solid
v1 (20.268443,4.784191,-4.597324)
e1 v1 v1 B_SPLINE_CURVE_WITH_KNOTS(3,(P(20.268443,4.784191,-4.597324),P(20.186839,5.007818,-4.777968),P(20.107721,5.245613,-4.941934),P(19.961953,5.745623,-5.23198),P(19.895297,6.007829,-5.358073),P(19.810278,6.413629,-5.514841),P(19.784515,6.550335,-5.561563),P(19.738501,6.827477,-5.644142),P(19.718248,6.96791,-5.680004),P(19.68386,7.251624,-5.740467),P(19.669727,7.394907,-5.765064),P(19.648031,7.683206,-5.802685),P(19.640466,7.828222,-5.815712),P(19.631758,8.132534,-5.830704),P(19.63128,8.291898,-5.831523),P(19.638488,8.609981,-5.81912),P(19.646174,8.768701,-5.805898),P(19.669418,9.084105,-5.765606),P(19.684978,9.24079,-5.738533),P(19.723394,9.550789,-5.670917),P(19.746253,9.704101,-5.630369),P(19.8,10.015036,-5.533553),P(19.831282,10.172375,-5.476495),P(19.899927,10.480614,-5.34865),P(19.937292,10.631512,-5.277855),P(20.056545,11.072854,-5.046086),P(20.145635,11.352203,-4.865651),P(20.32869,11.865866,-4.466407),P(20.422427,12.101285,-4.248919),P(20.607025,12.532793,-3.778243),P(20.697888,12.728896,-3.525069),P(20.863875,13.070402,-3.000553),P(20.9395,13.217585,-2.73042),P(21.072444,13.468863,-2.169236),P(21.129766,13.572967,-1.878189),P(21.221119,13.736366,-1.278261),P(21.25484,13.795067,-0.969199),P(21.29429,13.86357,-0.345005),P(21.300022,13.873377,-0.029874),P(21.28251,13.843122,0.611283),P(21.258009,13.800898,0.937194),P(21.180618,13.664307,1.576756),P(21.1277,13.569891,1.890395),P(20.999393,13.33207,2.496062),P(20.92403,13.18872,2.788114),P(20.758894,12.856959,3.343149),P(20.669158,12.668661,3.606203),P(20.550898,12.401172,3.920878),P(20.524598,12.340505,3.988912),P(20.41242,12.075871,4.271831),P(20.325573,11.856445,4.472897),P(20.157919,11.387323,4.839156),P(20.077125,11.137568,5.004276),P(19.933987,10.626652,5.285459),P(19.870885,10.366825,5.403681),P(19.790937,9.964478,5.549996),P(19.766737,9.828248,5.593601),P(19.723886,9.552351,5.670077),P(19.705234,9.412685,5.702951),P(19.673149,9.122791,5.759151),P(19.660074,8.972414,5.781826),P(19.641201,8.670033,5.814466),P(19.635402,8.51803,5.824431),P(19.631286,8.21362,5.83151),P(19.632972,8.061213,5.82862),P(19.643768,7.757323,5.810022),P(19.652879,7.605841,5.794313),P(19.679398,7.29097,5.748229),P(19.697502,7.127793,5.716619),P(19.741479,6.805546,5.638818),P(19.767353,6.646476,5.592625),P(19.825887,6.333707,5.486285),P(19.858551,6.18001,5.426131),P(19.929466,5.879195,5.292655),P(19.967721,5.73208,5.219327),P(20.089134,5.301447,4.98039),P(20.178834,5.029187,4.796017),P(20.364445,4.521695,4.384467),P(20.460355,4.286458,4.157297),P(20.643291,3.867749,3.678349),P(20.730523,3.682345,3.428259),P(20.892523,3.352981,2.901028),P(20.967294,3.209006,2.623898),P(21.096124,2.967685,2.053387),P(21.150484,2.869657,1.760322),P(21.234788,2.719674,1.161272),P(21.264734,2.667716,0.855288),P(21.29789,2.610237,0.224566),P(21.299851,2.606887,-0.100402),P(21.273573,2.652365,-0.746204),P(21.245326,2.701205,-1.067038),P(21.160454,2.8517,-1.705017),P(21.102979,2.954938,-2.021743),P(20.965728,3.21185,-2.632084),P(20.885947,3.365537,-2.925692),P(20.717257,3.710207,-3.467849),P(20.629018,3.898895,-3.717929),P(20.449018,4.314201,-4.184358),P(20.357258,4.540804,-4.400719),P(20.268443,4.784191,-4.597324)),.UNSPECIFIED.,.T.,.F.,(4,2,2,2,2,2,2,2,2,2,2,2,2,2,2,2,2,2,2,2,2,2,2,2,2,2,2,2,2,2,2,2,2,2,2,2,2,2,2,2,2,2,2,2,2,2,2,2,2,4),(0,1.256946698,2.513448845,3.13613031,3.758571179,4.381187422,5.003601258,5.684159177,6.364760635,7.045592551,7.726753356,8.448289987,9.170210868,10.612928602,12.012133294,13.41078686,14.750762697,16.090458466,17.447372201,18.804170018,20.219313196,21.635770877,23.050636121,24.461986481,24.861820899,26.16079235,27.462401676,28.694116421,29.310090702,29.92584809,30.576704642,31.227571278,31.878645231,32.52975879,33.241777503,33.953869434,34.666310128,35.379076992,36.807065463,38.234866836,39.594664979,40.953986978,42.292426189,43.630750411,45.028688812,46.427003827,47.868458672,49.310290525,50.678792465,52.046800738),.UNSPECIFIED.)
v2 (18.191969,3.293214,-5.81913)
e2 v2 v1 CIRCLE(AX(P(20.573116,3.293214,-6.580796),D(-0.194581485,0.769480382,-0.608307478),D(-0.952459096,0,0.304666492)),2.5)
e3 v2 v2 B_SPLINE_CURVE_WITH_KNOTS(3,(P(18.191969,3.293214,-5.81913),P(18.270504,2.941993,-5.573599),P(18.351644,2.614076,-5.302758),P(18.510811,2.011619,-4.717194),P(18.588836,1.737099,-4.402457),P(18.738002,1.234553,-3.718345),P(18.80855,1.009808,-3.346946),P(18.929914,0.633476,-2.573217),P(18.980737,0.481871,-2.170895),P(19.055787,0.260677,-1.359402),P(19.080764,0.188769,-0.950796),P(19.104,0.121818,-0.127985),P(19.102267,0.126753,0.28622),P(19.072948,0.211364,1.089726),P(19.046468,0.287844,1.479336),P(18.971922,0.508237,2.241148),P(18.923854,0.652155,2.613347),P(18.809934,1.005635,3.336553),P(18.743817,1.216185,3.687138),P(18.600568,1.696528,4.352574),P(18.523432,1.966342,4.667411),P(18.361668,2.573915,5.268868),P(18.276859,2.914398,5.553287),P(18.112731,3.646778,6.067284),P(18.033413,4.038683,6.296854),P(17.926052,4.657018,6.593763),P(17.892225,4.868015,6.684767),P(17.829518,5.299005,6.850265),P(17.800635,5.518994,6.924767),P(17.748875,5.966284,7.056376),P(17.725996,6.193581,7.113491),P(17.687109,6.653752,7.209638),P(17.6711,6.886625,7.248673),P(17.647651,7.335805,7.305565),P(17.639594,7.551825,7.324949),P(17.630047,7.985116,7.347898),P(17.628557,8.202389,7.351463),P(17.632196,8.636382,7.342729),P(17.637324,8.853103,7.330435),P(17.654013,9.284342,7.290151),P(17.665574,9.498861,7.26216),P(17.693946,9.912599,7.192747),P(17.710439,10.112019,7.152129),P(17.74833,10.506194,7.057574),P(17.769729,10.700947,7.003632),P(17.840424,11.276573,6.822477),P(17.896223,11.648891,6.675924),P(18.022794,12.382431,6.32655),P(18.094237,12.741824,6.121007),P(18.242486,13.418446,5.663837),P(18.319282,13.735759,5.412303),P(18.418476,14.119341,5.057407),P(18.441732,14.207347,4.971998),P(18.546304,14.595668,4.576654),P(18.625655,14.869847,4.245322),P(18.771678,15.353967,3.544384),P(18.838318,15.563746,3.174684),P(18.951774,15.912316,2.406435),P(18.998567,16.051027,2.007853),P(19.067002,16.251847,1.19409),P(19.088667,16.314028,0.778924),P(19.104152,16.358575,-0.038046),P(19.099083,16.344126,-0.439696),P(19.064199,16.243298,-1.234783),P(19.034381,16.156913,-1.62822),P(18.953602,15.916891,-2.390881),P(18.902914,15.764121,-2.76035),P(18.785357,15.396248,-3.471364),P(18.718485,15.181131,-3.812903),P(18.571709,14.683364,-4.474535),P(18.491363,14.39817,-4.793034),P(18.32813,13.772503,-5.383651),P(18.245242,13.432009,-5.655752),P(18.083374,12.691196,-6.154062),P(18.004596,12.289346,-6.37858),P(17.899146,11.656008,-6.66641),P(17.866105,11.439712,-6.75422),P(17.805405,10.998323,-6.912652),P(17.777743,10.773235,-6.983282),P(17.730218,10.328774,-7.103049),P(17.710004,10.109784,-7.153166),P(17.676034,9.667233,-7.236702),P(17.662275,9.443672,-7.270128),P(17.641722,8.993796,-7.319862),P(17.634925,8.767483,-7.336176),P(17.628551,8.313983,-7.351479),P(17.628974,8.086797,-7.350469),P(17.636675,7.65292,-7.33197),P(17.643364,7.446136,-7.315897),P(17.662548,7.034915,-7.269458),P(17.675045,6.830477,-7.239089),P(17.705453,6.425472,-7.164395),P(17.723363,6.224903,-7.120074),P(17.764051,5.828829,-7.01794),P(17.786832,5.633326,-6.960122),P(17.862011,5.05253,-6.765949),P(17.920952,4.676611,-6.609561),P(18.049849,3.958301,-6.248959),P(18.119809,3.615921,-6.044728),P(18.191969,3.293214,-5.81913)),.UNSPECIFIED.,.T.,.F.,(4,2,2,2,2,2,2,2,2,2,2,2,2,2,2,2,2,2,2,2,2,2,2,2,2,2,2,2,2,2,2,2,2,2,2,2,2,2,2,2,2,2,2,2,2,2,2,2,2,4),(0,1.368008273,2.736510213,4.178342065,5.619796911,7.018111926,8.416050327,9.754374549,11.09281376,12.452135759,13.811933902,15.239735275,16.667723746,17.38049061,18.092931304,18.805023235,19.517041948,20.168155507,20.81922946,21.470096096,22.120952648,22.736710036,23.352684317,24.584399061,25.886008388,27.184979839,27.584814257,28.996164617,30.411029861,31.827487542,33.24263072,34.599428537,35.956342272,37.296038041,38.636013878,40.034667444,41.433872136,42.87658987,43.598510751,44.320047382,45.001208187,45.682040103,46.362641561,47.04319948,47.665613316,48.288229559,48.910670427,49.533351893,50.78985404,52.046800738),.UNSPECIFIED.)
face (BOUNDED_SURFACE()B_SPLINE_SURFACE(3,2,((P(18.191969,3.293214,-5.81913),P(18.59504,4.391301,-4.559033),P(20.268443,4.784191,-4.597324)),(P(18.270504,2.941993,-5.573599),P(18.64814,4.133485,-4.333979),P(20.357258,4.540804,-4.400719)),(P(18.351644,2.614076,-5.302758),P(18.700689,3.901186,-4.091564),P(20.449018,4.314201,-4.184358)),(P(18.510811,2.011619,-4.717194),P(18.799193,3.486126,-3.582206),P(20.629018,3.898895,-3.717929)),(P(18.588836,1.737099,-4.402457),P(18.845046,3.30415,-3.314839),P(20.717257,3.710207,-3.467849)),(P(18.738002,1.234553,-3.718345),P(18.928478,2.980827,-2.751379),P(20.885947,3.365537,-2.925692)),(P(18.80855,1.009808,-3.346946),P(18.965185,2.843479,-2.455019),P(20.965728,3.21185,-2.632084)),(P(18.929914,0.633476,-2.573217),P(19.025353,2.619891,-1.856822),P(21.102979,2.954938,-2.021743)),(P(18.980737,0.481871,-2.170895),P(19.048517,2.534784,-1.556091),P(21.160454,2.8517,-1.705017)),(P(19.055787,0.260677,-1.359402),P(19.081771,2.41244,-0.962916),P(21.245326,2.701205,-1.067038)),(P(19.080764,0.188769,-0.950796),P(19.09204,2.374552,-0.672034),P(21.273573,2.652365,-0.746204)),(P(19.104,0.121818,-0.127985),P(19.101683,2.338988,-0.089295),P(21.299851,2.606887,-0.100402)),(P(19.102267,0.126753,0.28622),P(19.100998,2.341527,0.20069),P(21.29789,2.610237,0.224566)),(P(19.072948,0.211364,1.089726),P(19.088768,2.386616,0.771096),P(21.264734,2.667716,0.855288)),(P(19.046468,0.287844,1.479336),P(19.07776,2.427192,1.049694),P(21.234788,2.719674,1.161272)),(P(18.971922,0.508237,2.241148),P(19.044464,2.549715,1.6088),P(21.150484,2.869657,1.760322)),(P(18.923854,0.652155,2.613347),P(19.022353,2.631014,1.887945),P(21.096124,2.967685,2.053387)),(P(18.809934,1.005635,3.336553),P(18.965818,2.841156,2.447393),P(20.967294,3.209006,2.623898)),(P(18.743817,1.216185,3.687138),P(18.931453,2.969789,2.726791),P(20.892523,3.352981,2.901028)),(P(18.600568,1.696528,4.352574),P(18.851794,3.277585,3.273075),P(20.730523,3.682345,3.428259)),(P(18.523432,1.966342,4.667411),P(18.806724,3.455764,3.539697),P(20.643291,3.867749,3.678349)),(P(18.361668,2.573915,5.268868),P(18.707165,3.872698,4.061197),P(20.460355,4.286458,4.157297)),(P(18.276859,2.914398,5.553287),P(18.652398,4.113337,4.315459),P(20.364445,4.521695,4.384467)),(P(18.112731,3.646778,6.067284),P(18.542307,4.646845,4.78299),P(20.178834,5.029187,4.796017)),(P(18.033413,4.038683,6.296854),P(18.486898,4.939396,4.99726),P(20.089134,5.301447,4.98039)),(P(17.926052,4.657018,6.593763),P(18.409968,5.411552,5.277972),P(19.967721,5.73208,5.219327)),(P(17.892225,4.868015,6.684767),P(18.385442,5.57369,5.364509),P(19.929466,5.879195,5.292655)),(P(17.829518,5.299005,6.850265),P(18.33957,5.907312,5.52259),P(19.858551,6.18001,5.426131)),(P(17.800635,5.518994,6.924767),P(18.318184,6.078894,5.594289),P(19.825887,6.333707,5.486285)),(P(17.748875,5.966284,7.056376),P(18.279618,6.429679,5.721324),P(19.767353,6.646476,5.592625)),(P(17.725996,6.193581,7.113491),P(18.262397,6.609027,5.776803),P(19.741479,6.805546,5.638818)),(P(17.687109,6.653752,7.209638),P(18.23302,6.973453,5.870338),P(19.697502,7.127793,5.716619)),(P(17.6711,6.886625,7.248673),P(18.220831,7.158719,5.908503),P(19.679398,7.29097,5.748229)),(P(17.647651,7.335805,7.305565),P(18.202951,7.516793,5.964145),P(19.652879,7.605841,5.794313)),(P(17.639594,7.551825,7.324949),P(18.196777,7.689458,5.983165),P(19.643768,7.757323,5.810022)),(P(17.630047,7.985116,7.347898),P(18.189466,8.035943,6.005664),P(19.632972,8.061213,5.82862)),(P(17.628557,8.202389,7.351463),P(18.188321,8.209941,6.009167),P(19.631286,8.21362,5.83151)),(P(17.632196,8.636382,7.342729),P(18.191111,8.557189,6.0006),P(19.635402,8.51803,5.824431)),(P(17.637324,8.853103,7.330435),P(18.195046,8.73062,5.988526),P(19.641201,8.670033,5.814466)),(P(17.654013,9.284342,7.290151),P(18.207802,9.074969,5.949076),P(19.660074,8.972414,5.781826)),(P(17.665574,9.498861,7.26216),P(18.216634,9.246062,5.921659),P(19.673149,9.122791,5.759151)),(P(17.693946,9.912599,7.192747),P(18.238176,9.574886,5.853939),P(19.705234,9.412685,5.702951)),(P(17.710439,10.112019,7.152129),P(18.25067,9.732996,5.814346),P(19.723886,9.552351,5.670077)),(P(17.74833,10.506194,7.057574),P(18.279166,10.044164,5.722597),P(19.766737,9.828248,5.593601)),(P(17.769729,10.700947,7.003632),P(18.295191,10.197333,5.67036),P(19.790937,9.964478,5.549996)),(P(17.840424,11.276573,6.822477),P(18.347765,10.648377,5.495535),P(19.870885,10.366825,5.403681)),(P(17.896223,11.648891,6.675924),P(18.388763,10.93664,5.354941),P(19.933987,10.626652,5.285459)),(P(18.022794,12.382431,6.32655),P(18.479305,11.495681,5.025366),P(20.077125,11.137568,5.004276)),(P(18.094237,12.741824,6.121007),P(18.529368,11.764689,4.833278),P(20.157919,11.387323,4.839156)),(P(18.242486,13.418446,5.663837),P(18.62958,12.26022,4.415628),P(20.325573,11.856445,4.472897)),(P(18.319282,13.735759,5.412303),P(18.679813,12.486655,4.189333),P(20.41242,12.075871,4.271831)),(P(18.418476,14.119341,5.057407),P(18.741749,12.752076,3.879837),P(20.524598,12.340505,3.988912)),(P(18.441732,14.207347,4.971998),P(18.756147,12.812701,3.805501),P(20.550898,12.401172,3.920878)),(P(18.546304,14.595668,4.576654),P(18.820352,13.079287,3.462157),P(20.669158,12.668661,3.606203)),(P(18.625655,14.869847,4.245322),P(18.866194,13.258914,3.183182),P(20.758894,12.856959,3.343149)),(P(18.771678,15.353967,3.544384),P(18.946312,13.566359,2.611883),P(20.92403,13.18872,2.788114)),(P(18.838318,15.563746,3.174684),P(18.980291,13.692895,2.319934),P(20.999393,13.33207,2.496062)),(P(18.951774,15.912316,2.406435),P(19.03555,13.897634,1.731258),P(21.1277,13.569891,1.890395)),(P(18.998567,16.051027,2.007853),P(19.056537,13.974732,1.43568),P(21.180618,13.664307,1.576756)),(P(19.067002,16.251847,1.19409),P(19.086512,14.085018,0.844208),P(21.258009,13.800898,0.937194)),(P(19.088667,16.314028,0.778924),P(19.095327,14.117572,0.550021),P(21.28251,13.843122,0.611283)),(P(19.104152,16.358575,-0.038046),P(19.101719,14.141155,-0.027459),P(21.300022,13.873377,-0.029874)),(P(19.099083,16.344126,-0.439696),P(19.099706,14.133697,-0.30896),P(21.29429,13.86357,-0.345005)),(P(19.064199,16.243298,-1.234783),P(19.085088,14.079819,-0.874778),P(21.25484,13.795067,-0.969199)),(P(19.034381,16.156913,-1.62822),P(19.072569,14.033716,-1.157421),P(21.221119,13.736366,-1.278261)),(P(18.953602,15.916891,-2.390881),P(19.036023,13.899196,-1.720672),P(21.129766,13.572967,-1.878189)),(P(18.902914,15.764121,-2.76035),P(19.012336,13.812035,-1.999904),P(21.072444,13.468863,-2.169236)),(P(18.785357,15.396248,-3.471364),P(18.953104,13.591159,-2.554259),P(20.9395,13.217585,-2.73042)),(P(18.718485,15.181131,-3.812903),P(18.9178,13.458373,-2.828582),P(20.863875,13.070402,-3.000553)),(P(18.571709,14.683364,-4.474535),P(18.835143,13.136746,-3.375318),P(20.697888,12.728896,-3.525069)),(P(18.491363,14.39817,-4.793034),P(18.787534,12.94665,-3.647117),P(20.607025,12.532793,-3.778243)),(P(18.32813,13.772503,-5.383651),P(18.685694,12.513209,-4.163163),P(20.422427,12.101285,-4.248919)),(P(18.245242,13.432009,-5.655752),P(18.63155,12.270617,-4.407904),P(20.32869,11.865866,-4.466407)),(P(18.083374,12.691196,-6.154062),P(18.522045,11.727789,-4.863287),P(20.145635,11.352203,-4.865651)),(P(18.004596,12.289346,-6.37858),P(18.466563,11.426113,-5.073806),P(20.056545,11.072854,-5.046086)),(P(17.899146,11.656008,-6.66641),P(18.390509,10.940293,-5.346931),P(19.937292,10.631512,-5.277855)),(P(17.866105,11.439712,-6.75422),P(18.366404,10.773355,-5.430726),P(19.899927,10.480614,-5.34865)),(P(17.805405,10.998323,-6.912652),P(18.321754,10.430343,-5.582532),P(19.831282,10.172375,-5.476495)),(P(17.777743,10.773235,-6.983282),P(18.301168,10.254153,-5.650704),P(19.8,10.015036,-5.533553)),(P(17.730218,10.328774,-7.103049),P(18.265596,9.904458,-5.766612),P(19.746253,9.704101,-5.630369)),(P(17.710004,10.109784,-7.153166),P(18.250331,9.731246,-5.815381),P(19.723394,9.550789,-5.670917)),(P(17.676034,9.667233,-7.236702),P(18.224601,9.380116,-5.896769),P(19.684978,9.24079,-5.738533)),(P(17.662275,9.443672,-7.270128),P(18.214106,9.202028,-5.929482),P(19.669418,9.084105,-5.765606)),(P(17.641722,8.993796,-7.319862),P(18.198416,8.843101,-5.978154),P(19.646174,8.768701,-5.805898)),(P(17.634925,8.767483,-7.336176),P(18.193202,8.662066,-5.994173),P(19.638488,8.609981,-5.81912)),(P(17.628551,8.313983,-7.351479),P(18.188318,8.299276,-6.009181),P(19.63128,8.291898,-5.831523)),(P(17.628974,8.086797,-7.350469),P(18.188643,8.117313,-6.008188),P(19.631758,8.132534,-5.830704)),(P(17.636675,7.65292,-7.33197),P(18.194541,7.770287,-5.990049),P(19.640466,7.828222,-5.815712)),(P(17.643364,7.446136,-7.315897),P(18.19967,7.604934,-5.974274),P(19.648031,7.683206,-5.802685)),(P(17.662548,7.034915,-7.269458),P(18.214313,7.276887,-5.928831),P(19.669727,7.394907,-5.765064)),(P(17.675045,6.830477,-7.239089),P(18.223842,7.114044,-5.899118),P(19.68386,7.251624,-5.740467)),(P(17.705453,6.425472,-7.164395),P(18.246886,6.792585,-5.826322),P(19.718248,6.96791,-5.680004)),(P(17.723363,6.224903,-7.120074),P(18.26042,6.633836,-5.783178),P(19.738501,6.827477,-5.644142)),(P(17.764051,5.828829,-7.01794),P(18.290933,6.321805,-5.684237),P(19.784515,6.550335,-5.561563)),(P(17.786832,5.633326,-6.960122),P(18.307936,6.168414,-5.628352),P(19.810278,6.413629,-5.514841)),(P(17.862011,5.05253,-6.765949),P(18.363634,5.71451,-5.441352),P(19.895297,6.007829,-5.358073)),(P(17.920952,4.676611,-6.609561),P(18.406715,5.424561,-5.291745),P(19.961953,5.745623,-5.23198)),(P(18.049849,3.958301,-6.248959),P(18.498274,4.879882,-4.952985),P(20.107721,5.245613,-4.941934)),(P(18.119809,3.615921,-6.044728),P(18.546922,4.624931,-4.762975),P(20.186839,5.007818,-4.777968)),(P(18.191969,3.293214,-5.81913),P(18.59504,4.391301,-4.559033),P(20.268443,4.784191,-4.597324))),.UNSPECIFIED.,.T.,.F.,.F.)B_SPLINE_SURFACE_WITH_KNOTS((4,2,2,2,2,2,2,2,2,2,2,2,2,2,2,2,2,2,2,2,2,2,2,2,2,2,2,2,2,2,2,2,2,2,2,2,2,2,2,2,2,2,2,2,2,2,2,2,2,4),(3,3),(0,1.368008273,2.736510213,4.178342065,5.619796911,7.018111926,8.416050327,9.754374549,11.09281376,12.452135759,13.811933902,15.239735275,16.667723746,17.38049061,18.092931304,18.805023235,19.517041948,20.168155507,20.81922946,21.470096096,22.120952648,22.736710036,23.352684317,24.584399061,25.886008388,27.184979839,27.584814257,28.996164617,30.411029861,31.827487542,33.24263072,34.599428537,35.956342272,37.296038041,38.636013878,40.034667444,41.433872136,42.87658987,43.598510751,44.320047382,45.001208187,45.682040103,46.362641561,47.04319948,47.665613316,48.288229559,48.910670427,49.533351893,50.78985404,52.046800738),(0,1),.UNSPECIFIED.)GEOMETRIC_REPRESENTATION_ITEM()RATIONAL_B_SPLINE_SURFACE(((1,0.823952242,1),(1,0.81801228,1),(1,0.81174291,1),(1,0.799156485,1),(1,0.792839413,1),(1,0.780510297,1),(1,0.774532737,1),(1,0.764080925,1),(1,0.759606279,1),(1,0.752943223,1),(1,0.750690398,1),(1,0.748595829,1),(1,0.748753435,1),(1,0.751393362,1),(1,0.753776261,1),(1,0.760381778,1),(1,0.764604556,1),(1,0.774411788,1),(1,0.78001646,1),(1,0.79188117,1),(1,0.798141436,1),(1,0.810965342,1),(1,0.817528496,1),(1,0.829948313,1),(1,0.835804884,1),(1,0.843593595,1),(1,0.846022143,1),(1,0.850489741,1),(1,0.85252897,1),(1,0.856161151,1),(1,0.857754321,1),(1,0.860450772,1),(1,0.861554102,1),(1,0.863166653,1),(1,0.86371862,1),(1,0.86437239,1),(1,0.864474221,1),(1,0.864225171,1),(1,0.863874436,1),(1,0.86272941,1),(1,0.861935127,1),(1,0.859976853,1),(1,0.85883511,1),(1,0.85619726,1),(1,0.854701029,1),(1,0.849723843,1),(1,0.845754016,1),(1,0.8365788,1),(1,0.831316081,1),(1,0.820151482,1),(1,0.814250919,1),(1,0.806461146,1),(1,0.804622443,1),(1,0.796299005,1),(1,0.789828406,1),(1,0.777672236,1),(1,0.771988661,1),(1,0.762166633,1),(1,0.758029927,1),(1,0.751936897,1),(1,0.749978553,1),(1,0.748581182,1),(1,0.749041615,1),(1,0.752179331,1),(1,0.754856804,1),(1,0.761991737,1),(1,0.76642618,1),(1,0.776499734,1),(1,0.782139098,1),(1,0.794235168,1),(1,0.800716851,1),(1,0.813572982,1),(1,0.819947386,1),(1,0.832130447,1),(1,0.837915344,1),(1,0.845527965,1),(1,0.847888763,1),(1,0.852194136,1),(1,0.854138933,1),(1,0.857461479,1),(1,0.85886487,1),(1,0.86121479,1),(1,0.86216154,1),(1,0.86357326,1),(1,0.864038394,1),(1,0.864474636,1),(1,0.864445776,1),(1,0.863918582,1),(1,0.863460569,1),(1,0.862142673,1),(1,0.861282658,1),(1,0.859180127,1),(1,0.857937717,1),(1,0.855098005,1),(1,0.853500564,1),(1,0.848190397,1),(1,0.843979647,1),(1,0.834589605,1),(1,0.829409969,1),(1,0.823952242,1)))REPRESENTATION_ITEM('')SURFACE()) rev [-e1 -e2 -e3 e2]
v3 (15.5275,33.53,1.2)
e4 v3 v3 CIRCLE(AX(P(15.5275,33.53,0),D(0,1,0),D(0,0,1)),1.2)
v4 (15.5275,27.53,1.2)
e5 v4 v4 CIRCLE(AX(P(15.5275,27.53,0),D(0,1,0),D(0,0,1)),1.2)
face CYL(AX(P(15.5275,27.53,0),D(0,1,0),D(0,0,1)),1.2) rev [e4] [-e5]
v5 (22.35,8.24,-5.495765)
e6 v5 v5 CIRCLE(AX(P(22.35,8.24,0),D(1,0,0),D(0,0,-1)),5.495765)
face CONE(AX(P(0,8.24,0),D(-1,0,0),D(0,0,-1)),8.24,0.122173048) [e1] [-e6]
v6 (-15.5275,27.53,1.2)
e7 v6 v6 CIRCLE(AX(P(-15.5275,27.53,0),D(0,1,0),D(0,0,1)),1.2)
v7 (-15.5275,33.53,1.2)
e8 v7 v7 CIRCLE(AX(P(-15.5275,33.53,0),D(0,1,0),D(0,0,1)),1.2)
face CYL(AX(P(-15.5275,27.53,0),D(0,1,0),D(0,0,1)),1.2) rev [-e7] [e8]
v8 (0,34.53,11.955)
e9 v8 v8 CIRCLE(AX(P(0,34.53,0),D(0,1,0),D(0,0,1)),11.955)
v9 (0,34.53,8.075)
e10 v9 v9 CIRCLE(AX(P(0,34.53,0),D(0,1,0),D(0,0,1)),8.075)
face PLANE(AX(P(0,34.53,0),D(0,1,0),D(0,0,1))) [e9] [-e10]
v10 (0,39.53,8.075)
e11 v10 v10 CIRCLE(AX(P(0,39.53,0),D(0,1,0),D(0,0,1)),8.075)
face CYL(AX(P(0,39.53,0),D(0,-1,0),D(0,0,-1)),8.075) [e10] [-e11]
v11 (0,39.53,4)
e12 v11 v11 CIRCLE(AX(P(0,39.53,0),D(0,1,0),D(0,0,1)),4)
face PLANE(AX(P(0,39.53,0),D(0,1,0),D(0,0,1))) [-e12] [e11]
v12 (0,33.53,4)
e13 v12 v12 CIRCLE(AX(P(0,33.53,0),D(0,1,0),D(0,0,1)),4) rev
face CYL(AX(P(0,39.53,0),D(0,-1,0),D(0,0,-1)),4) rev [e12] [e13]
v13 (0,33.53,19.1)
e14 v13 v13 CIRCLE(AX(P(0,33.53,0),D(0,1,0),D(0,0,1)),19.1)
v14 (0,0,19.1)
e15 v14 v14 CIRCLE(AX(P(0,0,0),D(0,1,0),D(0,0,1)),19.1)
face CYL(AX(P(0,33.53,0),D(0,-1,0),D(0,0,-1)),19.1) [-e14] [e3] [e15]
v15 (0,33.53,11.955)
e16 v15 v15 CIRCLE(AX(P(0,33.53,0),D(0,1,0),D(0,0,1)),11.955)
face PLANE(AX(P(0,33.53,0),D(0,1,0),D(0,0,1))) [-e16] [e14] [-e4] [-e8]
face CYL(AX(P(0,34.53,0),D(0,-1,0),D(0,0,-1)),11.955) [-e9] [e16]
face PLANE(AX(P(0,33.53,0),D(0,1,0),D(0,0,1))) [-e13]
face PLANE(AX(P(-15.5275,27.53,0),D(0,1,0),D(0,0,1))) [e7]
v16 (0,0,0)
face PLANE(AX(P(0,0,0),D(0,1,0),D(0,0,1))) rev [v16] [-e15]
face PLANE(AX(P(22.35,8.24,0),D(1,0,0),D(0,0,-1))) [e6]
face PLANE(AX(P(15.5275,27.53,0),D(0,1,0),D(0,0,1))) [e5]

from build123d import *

# Parameters (mm, degrees)
SKETCH2_R           = 19.1
BOSS_EXTRUDE1_DEPTH = 33.53
SKETCH3_R           = 11.955
SKETCH3_R_2         = 8.075
BOSS_EXTRUDE2_DEPTH = 1
SKETCH3_2_R         = 8.075
SKETCH3_2_R_2       = 4
BOSS_EXTRUDE3_DEPTH = 6
SKETCH4_R           = 1.2
CUT_EXTRUDE1_DEPTH  = 6
SKETCH5_R           = 8.24
BOSS_EXTRUDE4_DEPTH = 22.35
BOSS_EXTRUDE4_TAPER = 7
FILLET1_R           = 2.5


with BuildPart() as part:
    # Sketch2 → Boss-Extrude1 (new body)
    with BuildSketch(Plane(origin=(0, 0, 0), x_dir=(1, 0, 0), z_dir=(0, 1, 0))):
        Circle(SKETCH2_R)
    extrude(amount=BOSS_EXTRUDE1_DEPTH)

    # Sketch3 → Boss-Extrude2 (add)
    with BuildSketch(Plane(origin=(0, 33.53, 0), x_dir=(1, 0, 0), z_dir=(0, 1, 0))):
        Circle(SKETCH3_R)
        Circle(SKETCH3_R_2, mode=Mode.SUBTRACT)
    extrude(amount=BOSS_EXTRUDE2_DEPTH)

    # Sketch3<2> → Boss-Extrude3 (add)
    with BuildSketch(Plane(origin=(0, 33.53, 0), x_dir=(1, 0, 0), z_dir=(0, 1, 0))):
        Circle(SKETCH3_2_R)
        Circle(SKETCH3_2_R_2, mode=Mode.SUBTRACT)
    extrude(amount=BOSS_EXTRUDE3_DEPTH)

    # Sketch4 → Cut-Extrude1 (cut)
    with BuildSketch(Plane(origin=(0, 33.53, 0), x_dir=(1, 0, 0), z_dir=(0, 1, 0))):
        with Locations((-15.5275, 0)):
            Circle(SKETCH4_R)
        with Locations((15.5275, 0)):
            Circle(SKETCH4_R)
    extrude(amount=-CUT_EXTRUDE1_DEPTH, mode=Mode.SUBTRACT)

    # Sketch5 → Boss-Extrude4 (add)
    with BuildSketch(Plane(origin=(0, 0, 0), x_dir=(0, 0, -1), z_dir=(1, 0, 0))):
        with Locations((0, 8.24)):
            Circle(SKETCH5_R)
    extrude(amount=BOSS_EXTRUDE4_DEPTH, taper=BOSS_EXTRUDE4_TAPER)

    # Fillet1
    fillet1_edges = [part.edges().sort_by_distance(p)[0] for p in [
        (18.128445003, 8.239999998, 6.014106781),
    ]]
    fillet(fillet1_edges, radius=FILLET1_R)


solid = part.part
